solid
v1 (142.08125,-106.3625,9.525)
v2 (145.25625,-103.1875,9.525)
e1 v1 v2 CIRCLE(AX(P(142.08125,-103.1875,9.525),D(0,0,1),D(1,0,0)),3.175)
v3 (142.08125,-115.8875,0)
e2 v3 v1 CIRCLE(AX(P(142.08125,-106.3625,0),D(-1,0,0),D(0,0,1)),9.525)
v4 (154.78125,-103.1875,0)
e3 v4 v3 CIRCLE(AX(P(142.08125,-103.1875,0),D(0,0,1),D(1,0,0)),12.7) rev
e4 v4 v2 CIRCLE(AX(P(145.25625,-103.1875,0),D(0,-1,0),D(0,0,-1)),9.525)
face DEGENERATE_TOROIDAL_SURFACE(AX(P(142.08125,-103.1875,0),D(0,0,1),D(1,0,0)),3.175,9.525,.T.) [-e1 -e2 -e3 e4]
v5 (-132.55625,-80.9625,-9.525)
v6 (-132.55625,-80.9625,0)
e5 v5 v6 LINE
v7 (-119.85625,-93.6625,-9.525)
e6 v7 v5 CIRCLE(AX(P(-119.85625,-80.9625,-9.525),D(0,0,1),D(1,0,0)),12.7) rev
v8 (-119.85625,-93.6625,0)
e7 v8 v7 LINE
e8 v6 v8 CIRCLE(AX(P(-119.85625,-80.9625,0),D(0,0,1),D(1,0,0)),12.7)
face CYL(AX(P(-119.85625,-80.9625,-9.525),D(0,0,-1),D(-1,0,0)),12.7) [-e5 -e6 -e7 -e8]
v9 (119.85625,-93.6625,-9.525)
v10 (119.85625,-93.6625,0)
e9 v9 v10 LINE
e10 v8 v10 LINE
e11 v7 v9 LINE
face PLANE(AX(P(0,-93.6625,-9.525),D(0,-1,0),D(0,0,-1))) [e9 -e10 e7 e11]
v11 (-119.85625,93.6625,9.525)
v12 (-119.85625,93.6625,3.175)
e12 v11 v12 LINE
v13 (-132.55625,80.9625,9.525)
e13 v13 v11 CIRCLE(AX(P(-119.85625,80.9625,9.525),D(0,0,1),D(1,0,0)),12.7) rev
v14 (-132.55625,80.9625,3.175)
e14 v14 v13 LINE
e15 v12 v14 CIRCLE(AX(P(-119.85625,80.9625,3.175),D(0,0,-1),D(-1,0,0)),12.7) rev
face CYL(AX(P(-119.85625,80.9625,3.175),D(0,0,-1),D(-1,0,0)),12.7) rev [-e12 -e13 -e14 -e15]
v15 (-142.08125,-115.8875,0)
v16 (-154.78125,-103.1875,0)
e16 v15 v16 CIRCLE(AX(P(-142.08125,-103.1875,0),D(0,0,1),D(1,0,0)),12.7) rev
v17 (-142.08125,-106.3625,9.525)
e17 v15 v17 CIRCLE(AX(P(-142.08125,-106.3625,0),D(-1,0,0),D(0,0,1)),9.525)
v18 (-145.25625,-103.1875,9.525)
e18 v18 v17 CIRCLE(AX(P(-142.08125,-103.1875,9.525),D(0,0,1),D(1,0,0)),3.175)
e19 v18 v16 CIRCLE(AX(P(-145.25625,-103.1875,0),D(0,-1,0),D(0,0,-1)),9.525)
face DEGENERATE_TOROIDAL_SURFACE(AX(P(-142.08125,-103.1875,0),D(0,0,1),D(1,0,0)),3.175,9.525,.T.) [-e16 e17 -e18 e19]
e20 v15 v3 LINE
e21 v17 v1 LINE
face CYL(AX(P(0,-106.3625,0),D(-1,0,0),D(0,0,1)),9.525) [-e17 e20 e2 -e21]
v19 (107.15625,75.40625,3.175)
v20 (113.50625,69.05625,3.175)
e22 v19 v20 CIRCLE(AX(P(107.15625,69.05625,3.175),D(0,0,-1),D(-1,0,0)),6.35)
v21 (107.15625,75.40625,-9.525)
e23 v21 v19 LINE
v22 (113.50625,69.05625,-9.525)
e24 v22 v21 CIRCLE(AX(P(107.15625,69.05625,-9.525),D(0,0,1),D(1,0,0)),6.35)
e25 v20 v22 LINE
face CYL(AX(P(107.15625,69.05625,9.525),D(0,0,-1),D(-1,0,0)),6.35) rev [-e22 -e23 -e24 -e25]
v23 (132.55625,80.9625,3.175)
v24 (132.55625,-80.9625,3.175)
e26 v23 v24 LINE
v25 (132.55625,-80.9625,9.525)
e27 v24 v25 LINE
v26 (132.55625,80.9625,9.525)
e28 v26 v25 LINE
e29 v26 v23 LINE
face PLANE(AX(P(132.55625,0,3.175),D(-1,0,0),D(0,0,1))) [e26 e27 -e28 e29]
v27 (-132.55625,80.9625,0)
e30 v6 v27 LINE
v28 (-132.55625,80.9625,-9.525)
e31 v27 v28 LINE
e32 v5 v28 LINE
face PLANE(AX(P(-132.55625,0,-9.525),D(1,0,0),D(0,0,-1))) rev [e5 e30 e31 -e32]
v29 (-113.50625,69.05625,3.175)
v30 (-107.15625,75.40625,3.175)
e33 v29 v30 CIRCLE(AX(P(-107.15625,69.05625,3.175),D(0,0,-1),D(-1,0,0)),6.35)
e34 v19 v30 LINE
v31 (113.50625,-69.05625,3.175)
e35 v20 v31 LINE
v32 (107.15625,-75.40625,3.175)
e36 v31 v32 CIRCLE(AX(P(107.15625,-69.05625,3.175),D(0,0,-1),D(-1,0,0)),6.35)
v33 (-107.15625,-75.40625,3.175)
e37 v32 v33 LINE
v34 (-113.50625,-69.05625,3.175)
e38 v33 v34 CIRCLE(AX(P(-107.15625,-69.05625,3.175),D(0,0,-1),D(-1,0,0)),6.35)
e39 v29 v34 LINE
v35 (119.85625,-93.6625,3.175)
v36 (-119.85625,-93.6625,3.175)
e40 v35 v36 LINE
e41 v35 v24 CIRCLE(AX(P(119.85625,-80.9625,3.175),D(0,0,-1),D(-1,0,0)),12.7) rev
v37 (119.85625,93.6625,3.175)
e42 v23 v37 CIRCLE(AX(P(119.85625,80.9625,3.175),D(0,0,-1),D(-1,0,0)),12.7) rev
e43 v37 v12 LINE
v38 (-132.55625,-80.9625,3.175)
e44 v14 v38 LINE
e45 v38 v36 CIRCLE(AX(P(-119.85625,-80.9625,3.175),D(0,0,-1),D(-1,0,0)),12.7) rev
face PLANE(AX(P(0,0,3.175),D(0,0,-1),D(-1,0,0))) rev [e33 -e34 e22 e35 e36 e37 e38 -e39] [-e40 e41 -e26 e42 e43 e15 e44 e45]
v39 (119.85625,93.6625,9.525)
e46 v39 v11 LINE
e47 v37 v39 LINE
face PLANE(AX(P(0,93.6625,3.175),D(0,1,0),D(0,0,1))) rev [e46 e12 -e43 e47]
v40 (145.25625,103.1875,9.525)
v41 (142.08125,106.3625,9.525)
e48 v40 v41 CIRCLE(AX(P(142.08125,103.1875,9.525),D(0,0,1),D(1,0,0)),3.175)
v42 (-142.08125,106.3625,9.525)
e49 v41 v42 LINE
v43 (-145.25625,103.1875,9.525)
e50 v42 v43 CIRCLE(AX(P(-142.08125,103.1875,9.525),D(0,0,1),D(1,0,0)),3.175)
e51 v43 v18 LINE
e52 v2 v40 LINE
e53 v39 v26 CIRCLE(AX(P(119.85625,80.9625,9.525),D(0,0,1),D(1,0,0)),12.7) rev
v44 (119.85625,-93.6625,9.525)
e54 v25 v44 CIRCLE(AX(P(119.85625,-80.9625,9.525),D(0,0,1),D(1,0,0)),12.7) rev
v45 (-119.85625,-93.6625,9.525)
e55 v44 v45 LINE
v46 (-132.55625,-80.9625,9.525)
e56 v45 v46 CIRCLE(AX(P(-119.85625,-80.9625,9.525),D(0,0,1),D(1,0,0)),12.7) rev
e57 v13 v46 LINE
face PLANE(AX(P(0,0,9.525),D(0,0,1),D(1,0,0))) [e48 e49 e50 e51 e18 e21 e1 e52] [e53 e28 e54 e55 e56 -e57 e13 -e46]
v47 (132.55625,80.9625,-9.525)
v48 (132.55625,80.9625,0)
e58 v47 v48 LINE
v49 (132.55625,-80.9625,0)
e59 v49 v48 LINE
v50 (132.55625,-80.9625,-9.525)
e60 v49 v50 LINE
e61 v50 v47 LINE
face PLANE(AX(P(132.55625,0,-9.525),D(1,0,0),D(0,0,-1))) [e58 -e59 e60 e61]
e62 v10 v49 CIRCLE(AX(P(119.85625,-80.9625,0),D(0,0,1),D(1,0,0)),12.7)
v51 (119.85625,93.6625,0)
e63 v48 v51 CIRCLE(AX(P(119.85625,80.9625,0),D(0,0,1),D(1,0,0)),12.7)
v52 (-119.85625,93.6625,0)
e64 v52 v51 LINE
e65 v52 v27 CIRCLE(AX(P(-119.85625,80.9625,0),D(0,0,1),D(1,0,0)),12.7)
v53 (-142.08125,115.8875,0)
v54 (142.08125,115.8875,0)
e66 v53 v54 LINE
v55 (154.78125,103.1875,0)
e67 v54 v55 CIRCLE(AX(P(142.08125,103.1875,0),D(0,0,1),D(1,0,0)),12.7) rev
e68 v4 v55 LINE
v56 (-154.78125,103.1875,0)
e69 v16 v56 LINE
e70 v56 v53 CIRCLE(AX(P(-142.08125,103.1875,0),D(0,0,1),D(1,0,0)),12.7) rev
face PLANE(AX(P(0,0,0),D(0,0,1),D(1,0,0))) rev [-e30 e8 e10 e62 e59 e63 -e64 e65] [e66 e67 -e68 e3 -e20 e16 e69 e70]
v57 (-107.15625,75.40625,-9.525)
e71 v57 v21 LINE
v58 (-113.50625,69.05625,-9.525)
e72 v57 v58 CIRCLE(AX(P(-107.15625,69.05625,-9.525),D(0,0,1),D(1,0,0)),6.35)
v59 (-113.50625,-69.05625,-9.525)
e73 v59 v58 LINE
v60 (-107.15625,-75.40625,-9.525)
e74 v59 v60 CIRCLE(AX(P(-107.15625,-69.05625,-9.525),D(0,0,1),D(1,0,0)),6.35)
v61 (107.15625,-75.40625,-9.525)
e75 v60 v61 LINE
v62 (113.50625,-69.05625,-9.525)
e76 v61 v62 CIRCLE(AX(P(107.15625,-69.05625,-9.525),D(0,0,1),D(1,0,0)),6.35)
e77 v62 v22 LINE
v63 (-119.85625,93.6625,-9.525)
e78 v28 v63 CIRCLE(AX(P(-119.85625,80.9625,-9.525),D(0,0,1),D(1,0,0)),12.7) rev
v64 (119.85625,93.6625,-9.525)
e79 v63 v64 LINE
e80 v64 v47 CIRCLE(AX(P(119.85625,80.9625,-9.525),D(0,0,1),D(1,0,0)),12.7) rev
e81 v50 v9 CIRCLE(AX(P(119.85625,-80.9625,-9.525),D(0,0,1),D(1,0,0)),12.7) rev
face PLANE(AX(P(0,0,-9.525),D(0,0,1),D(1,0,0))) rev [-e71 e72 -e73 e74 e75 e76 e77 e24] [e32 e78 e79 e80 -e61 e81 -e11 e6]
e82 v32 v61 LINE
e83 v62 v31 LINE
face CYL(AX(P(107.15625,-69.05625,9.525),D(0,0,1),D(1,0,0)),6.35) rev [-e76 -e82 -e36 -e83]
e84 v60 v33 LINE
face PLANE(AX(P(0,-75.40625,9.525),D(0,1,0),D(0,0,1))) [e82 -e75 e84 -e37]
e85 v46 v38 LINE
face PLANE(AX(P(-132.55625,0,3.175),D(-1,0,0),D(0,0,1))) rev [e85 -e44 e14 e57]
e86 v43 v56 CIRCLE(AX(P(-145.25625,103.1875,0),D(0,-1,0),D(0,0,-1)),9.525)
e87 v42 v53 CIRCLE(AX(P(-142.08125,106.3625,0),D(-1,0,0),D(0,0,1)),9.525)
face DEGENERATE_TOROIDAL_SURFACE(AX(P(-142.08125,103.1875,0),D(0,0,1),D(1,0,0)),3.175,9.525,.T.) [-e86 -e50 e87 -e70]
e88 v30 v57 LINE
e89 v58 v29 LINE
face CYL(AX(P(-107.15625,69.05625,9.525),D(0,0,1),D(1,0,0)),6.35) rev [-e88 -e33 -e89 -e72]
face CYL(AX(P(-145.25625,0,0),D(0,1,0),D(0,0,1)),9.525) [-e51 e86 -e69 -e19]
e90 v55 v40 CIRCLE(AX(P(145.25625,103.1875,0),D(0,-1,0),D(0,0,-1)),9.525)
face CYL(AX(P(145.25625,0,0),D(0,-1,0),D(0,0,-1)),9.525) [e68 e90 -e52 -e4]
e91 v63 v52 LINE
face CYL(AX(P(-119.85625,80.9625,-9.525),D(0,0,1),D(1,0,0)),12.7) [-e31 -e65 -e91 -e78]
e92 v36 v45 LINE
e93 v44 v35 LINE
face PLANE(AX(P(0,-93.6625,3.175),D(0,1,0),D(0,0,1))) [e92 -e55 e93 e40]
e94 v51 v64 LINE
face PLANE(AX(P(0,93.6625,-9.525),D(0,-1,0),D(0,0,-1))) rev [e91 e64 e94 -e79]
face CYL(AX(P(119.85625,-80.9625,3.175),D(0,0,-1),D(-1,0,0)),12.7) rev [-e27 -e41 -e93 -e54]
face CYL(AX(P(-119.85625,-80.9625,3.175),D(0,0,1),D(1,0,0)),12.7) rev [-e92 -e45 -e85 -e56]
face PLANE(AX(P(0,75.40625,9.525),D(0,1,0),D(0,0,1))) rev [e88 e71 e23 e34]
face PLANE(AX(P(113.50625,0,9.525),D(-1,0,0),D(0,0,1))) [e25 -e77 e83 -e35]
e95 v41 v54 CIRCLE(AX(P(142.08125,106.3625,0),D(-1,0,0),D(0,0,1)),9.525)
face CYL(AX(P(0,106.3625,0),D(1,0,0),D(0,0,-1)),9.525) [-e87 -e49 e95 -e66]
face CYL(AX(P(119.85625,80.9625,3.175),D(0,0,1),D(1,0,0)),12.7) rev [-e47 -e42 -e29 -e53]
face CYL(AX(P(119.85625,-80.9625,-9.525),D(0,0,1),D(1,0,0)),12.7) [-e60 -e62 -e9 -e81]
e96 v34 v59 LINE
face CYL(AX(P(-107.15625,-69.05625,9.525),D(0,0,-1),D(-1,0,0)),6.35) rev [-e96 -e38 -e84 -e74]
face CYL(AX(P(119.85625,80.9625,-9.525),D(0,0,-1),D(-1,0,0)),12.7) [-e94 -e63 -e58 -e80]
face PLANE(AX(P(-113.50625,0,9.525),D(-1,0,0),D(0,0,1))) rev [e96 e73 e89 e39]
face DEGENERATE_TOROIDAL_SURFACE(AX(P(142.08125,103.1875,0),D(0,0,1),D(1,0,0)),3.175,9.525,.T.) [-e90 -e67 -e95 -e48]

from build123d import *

# Parameters (mm, degrees)
SKETCH1_W           = 309.5625
SKETCH1_H           = 231.775
SKETCH1_W_2         = 265.1125
SKETCH1_H_2         = 187.325
SKETCH1_W_3         = 227.0125
SKETCH1_H_3         = 150.8125
BOSS_EXTRUDE1_DEPTH = 9.525
SKETCH1_3_W         = 265.1125
SKETCH1_3_H         = 187.325
SKETCH1_3_W_2       = 227.0125
SKETCH1_3_H_2       = 150.8125
BOSS_EXTRUDE2_DEPTH = 9.525
FILLET1_R           = 12.7
CUT_EXTRUDE1_START  = 9.525
SKETCH1_4_W         = 265.1125
SKETCH1_4_H         = 187.325
SKETCH1_4_W_2       = 227.0125
SKETCH1_4_H_2       = 150.8125
CUT_EXTRUDE1_DEPTH  = 6.35
FILLET2_R           = 6.35
FILLET3_R           = 12.7
FILLET4_R           = 9.525


with BuildPart() as part:
    # Sketch1 → Boss-Extrude1 (new body)
    # profile 1 of 2: a face of its own
    with BuildSketch(Plane.XY):
        Rectangle(SKETCH1_W, SKETCH1_H)
        Rectangle(SKETCH1_W_2, SKETCH1_H_2, mode=Mode.SUBTRACT)
    # profile 2 of 2: a face of its own
    with BuildSketch(Plane.XY):
        Rectangle(SKETCH1_W_2, SKETCH1_H_2)
        Rectangle(SKETCH1_W_3, SKETCH1_H_3, mode=Mode.SUBTRACT)
    extrude(amount=BOSS_EXTRUDE1_DEPTH)

    # Sketch1<3> → Boss-Extrude2 (add)
    with BuildSketch(Plane.XY):
        Rectangle(SKETCH1_3_W, SKETCH1_3_H)
        Rectangle(SKETCH1_3_W_2, SKETCH1_3_H_2, mode=Mode.SUBTRACT)
    extrude(amount=-BOSS_EXTRUDE2_DEPTH)

    # Fillet1
    fillet1_edges = [part.edges().sort_by_distance(p)[0] for p in [
        (-154.78125, -115.8875, 4.7625),
        (-154.78125, 115.8875, 4.7625),
        (154.78125, 115.8875, 4.7625),
        (154.78125, -115.8875, 4.7625),
        (132.55625, -93.6625, -4.7625),
        (-132.55625, -93.6625, -4.7625),
        (-132.55625, 93.6625, -4.7625),
        (132.55625, 93.6625, -4.7625),
    ]]
    fillet(fillet1_edges, radius=FILLET1_R)

    # Sketch1<4> → Cut-Extrude1 (cut)
    with BuildSketch(Plane.XY.offset(CUT_EXTRUDE1_START)):
        Rectangle(SKETCH1_4_W, SKETCH1_4_H)
        Rectangle(SKETCH1_4_W_2, SKETCH1_4_H_2, mode=Mode.SUBTRACT)
    extrude(amount=-CUT_EXTRUDE1_DEPTH, mode=Mode.SUBTRACT)

    # Fillet2
    fillet2_edges = [part.edges().sort_by_distance(p)[0] for p in [
        (-113.50625, 75.40625, -3.175),
        (113.50625, 75.40625, -3.175),
        (-113.50625, -75.40625, -3.175),
        (113.50625, -75.40625, -3.175),
    ]]
    fillet(fillet2_edges, radius=FILLET2_R)

    # Fillet3
    fillet3_edges = [part.edges().sort_by_distance(p)[0] for p in [
        (-132.55625, -93.6625, 6.35),
        (-132.55625, 93.6625, 6.35),
        (132.55625, 93.6625, 6.35),
        (132.55625, -93.6625, 6.35),
    ]]
    fillet(fillet3_edges, radius=FILLET3_R)

    # Fillet4
    fillet4_edges = [part.edges().sort_by_distance(p)[0] for p in [
        (-151.061506121, -112.167756121, 9.525),
        (0, -115.8875, 9.525),
        (151.061506121, -112.167756121, 9.525),
        (154.78125, 0, 9.525),
        (151.061506121, 112.167756121, 9.525),
        (0, 115.8875, 9.525),
        (-151.061506121, 112.167756121, 9.525),
        (-154.78125, 0, 9.525),
    ]]
    fillet(fillet4_edges, radius=FILLET4_R - 0.0001)  # a hair under: the kernel refuses the full size


solid = part.part
